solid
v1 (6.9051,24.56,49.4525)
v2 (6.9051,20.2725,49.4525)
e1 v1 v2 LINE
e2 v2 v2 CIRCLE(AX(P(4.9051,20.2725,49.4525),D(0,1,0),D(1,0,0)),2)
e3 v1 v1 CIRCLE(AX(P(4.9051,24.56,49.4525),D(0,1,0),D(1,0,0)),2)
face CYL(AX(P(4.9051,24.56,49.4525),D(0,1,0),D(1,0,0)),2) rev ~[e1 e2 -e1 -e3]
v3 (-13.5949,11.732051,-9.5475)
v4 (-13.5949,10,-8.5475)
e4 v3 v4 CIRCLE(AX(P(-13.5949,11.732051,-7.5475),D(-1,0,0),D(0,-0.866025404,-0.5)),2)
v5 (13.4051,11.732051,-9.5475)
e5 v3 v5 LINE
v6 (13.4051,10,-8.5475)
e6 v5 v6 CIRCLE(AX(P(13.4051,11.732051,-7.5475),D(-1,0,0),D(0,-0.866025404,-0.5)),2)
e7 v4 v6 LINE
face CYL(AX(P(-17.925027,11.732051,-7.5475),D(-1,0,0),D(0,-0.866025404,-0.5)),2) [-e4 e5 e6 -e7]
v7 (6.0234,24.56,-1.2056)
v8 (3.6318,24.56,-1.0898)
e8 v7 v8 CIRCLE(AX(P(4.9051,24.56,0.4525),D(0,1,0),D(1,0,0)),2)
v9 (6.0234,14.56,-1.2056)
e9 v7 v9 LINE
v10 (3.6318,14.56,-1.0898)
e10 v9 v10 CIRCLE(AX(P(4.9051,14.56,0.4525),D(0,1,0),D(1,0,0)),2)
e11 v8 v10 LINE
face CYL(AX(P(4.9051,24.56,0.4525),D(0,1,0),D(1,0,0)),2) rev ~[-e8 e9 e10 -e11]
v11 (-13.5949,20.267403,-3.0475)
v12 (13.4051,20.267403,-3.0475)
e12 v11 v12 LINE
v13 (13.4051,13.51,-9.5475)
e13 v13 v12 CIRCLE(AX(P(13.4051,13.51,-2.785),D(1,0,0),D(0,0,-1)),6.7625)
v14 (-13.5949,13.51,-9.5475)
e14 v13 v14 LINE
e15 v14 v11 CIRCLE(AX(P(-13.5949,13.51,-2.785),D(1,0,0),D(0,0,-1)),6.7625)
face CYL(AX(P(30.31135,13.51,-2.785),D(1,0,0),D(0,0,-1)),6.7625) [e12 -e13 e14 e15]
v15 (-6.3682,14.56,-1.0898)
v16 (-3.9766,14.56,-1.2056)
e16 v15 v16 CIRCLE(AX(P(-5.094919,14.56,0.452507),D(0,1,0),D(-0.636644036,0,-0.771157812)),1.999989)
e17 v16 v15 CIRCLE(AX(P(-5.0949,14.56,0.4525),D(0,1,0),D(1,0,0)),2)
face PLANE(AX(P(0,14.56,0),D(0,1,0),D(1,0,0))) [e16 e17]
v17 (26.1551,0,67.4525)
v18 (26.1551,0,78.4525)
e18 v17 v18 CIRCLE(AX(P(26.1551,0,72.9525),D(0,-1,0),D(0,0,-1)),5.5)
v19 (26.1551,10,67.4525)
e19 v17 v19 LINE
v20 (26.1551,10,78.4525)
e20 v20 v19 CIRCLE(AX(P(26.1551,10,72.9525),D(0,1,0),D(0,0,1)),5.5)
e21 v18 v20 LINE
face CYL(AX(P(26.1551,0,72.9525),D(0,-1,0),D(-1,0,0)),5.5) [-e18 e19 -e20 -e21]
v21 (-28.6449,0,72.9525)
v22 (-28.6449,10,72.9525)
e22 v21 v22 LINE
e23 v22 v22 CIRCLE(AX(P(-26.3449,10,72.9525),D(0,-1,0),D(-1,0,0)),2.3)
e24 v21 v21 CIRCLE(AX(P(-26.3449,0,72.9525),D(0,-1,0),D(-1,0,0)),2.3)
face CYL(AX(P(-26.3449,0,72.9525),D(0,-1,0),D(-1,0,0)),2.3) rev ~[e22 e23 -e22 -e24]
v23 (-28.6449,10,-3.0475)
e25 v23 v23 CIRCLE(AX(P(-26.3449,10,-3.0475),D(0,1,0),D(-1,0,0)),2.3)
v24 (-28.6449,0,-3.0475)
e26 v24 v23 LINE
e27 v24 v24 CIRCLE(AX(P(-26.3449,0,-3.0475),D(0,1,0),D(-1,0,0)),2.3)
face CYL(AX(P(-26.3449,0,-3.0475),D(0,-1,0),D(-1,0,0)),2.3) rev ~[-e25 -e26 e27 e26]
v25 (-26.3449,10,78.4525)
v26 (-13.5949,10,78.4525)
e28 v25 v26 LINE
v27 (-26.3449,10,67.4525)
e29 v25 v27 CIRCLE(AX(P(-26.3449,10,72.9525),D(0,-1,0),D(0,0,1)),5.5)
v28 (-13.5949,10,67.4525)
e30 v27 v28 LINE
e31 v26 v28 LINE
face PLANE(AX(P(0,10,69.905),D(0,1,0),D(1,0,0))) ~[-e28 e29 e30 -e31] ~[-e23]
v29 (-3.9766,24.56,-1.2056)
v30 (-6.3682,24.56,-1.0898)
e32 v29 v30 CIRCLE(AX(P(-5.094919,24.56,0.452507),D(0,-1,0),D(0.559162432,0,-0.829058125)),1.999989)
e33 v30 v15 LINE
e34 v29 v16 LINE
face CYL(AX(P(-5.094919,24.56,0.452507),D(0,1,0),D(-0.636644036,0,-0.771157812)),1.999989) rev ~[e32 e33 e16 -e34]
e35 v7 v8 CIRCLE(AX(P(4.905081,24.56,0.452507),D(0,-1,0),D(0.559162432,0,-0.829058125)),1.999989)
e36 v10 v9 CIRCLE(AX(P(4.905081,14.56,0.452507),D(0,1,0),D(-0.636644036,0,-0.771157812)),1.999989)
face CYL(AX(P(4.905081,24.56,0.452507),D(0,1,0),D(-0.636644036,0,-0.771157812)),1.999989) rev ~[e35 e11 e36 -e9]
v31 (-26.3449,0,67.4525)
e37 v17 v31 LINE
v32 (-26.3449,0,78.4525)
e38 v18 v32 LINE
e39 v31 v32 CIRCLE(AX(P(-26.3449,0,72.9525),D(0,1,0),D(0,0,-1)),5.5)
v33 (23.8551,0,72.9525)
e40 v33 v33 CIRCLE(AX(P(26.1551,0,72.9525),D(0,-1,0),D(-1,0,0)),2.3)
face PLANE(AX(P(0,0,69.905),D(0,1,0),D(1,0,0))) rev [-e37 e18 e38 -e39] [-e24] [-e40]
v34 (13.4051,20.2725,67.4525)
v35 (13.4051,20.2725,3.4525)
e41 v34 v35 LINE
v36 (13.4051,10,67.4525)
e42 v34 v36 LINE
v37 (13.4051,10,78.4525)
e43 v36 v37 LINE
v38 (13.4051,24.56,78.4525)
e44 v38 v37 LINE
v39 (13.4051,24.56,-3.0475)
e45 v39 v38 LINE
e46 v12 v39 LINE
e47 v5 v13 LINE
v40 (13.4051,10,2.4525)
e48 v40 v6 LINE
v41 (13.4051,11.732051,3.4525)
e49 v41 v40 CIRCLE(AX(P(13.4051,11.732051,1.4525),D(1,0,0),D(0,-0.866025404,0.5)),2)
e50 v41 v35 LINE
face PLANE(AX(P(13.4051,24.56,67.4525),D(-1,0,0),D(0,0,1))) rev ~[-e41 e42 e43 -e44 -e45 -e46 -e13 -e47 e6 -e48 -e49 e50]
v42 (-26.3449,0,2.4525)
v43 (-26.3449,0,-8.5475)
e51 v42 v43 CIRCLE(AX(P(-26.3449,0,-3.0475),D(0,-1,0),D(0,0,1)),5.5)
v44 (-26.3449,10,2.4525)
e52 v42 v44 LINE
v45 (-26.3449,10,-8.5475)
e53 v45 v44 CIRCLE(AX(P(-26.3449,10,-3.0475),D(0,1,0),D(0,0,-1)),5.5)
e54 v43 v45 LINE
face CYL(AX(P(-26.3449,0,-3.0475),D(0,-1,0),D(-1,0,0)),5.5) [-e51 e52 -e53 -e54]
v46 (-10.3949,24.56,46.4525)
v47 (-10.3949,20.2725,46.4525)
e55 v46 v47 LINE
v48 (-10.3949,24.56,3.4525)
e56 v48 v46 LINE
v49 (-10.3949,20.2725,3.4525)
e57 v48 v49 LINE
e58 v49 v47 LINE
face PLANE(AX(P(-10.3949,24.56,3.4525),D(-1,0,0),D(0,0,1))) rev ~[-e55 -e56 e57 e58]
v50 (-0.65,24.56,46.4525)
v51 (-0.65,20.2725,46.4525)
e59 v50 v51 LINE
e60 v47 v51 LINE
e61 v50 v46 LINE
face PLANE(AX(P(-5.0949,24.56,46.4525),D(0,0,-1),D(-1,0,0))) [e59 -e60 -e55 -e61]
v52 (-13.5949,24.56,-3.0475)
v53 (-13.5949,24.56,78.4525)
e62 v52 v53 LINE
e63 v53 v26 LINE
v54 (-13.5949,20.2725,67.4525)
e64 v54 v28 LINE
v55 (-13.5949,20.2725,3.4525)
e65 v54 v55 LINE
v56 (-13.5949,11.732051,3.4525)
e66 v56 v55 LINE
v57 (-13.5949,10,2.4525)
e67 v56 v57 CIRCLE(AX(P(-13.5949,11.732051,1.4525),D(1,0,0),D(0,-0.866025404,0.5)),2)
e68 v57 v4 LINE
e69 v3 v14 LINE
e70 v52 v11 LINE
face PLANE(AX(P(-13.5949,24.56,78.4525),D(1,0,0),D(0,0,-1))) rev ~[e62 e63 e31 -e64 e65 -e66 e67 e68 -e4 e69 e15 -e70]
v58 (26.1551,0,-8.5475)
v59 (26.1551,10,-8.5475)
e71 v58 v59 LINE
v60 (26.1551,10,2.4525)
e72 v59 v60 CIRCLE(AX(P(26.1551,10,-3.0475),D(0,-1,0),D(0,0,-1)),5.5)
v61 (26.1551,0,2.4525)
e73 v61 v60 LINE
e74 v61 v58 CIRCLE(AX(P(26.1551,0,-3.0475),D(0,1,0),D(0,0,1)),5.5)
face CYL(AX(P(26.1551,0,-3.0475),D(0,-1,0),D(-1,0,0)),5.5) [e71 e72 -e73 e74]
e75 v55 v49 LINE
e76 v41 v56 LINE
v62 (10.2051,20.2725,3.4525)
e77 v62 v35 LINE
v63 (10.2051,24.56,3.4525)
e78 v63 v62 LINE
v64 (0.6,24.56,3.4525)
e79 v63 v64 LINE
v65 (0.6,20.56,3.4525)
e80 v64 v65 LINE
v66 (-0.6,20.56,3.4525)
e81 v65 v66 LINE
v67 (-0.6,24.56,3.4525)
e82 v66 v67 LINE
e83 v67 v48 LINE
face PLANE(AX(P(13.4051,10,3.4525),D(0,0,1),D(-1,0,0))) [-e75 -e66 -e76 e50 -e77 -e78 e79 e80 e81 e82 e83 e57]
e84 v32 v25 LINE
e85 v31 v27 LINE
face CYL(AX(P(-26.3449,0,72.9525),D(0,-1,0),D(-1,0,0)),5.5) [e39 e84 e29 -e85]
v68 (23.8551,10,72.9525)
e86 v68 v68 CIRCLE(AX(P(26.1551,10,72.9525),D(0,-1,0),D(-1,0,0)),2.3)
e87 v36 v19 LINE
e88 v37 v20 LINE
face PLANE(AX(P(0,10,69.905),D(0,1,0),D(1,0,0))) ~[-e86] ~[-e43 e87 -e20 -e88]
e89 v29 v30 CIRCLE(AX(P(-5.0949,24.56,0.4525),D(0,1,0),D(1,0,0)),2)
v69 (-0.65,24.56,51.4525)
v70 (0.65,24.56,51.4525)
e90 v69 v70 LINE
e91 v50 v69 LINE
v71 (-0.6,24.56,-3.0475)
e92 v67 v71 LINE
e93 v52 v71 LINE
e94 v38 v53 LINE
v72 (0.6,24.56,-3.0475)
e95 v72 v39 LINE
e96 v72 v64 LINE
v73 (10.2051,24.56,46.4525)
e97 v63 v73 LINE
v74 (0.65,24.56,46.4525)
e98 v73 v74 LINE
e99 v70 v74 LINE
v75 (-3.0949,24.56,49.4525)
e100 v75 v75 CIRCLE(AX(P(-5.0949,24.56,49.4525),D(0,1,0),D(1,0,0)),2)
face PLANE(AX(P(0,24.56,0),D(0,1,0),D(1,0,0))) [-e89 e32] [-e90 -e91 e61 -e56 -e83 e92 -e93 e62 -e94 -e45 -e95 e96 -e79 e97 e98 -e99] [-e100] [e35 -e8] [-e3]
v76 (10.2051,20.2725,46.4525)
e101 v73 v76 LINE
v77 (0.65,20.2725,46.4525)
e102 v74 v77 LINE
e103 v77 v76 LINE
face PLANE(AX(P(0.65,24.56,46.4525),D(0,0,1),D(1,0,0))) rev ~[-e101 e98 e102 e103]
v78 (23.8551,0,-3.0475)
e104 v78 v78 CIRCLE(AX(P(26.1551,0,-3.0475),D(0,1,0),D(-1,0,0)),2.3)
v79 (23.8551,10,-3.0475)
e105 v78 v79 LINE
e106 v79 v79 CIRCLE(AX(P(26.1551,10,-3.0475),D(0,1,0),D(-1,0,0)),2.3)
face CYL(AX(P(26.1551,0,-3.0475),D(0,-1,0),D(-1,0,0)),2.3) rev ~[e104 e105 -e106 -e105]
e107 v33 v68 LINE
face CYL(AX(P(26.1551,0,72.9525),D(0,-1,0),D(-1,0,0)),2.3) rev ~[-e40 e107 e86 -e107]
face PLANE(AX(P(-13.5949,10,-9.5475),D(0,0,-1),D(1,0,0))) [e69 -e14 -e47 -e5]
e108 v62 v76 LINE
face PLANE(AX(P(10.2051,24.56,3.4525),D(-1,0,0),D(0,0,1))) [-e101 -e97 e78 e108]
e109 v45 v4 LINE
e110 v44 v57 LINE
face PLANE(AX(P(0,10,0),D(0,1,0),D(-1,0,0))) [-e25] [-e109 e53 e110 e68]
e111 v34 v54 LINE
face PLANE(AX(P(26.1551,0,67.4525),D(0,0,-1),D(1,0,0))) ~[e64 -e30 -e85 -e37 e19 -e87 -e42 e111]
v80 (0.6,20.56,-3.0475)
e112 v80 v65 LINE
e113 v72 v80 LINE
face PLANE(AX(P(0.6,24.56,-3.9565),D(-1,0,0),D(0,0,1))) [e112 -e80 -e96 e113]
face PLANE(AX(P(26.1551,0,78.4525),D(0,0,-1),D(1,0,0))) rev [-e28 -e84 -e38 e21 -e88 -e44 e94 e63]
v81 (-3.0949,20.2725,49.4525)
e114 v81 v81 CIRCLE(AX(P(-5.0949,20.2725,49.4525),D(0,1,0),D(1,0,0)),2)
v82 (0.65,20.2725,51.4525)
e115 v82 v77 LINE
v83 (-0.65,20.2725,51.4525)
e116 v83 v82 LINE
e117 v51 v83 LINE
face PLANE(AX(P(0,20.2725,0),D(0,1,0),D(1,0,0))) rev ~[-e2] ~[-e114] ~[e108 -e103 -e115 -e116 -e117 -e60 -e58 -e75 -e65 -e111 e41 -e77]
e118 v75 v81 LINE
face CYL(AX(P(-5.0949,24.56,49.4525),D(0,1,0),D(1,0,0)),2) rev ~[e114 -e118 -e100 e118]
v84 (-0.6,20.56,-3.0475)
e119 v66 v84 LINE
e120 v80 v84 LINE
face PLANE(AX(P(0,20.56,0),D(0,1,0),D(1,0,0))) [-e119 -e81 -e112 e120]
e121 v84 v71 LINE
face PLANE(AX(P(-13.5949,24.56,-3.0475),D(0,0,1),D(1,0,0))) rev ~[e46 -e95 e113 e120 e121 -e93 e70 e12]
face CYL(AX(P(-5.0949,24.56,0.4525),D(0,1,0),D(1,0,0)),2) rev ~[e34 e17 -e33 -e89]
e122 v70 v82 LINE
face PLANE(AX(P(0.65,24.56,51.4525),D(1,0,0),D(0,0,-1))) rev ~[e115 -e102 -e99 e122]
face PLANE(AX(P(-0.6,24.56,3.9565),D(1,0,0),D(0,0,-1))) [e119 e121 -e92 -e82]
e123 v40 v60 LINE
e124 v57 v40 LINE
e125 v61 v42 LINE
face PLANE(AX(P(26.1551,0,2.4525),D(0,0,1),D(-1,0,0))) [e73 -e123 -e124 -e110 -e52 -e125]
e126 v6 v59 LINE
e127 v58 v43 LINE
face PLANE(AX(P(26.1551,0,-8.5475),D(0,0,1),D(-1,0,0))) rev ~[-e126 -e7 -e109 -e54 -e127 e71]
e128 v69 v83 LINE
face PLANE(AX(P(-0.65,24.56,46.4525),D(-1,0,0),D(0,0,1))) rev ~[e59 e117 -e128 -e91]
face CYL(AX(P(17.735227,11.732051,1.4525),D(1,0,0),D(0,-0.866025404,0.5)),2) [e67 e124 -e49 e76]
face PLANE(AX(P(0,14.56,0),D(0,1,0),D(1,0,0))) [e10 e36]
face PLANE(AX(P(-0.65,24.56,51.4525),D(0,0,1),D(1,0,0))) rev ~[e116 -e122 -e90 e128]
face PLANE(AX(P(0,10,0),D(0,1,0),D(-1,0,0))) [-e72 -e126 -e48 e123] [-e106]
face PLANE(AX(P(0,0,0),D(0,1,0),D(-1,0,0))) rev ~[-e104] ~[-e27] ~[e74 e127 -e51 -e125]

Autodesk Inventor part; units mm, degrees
ref_plane "YZ Plane" through (0, 0, 0) normal (1, 0, 0) x (0, 1, 0)
ref_plane "XZ Plane" through (0, 0, 0) normal (0, 1, 0) x (-1, 0, 0)
ref_plane "XY Plane" through (0, 0, 0) normal (0, 0, 1) x (1, 0, 0)
sketch "Sketch1" plane through (0, 0, 0) normal (0, 1, 0) x (-1, 0, 0)
  circle A0 centre (-26.1551, -3.0475) radius 2.3
  arc A1 (-34.9051, -0.0475) -> (-17.4051, -0.0475) centre (-26.1551, -0.0475) ccw
  arc A2 (17.5949, -0.0475) -> (35.0949, -0.0475) centre (26.3449, -0.0475) ccw
  circle A3 centre (26.3449, -3.0475) radius 2.3
  circle A4 centre (-26.1551, -3.0475) radius 2.3
  circle A5 centre (26.3449, -3.0475) radius 2.3
  circle A6 centre (26.3449, -0.0475) radius 8.75
  circle A7 centre (-26.1551, -0.0475) radius 8.75
  line L0 (-34.9051, -0.0475) -> (-17.4051, -0.0475)
  line L1 (17.5949, -0.0475) -> (35.0949, -0.0475)
  circle A8 centre (-26.1551, -3.0475) radius 5.5
  circle A9 centre (26.3449, -3.0475) radius 5.5
  line L2 (-26.1551, -8.5475) -> (26.3449, -8.5475)
  line L3 (-26.1551, 2.4525) -> (26.3449, 2.4525)
  point P0 (0, 0)
  dimension "d0" = 11
  dimension "d1" = 11
  dimension "d41" = 4.6
  dimension "d42" = 4.6
extrude "Extrusion1" add sketch "Sketch1" along normal blind 10 contours L2 A8 L0 A1 | A1 A7 L3 A6 A2 L2 | A7 L0 A8 L3 | A8 L0 | L0 A8 | A2 L1 A9 L2 | L3 A9 L1 A6 | A9 L1 | A9 L1 picked at (-18.6939, -1.0014) picked at (-20.5799, 1.133) picked at (18.8536, -1.0809) picked at (20.7697, 1.133)
sketch "Sketch2" plane through (0, 10, 0) normal (0, 1, 0) x (1, 0, 0)
  line L0 (26.1551, 8.5475) -> (-26.3449, 8.5475) projected
  line L1 (-26.3449, -2.4525) -> (26.1551, -2.4525) projected
  arc A0 (-26.3449, 8.5475) -> (-26.3449, -2.4525) centre (-26.3449, 3.0475) ccw projected
  arc A1 (26.1551, -2.4525) -> (26.1551, 8.5475) centre (26.1551, 3.0475) ccw projected
  line L2 (-31.8449, 3.0475) -> (31.6551, 3.0475)
  line L3 (13.4051, -3.4525) -> (-13.5949, -3.4525)
  line L4 (-13.5949, -3.4525) -> (-13.5949, 9.5475)
  line L5 (-13.5949, 9.5475) -> (13.4051, 9.5475)
  line L6 (13.4051, 9.5475) -> (13.4051, -3.4525)
  line L7 (13.4051, -3.4525) -> (-13.5949, 9.5475) construction
  line L8 (-13.5949, -3.4525) -> (13.4051, 9.5475) construction
  point P0 (0, 0)
  point P1 (-0.0949, 3.0475)
  dimension "d4" = 27
  dimension "d5" = 13
extrude "Extrusion2" add sketch "Sketch2" along normal blind 14.56 contours L6 L2 L4 L0 | L0 L4 L5 L6 | L6 L1 L4 L2 | L6 L3 L4 L1
fillet "Fillet1" radius 2 2 edges at (-0.0949, 10, 3.4525) (-0.0949, 10, -9.5475)
sketch "Sketch3" plane through (0, 24.56, 0) normal (0, 1, 0) x (1, 0, 0)
  arc A0 (-6.3682, 1.0898) -> (-3.9766, 1.2056) centre (-5.0949, -0.4525) ccw
  arc A1 (3.6318, 1.0898) -> (6.0234, 1.2056) centre (4.9051, -0.4525) ccw
  circle A2 centre (4.9051, -0.4525) radius 2
  circle A3 centre (-5.0949, -0.4525) radius 2
  line L0 (-13.5949, 9.5475) -> (-13.5949, -3.4525) projected
  line L1 (13.4051, 9.5475) -> (-13.5949, 9.5475) projected
  line L2 (-13.5949, -3.4525) -> (13.4051, -3.4525) projected
  line L3 (13.4051, -3.4525) -> (13.4051, 9.5475) projected
  point P0 (0, 0)
  point P1 (6.0234, 1.2056)
  point P2 (3.6318, 1.0898)
  point P3 (-3.9766, 1.2056)
  point P4 (-6.3682, 1.0898)
  dimension "d12" = 8.5
  dimension "d13" = 8.5
  dimension "d43" = 2
  dimension "d44" = 2
extrude "Extrusion3" cut sketch "Sketch3" against normal blind 10 contours A3 A0 | A2 A1
sketch "Sketch4" plane through (0, 24.56, 0) normal (0, 1, 0) x (1, 0, 0)
  line L0 (13.4051, 9.5475) -> (-13.5949, 9.5475) projected
  line L1 (-13.5949, -2.4525) -> (-13.5949, 8.5475) projected
  line L2 (13.4051, 9.5475) -> (-13.5949, 9.5475)
  line L3 (-13.5949, 9.5475) -> (-13.5949, 3.0475)
  line L4 (-13.5949, 3.0475) -> (13.4051, 3.0475)
  line L5 (13.4051, 3.0475) -> (13.4051, 9.5475)
  point P0 (0, 0)
extrude "Extrusion4" cut sketch "Sketch4" against normal blind 4.2875
fillet "Fillet2" radius 6.7625 1 edges at (-0.0949, 20.2725, -9.5475)
sketch "Sketch5" plane through (0, 24.56, 0) normal (0, 1, 0) x (1, 0, 0)
  line L0 (-13.5949, -3.4525) -> (13.4051, -3.4525) projected
  line L1 (-10.3949, -3.4525) -> (-10.3949, -67.4525)
  line L2 (10.2051, -3.4525) -> (10.2051, -67.4525)
  line L3 (-13.5949, 3.0475) -> (-13.5949, -3.4525) projected
  circle A0 centre (-5.0949, -49.4525) radius 2
  line L4 (13.4051, -3.4525) -> (13.4051, 3.0475) projected
  circle A1 centre (4.9051, -49.4525) radius 2
  circle A2 centre (4.9051, -49.4525) radius 3
  circle A3 centre (-5.0949, -49.4525) radius 3
  line L5 (-10.3949, -67.4525) -> (10.2051, -67.4525)
  line L6 (-10.3949, -67.4525) -> (-13.5949, -67.4525)
  line L7 (-13.5949, -67.4525) -> (-13.5949, -3.4525)
  line L8 (10.2051, -67.4525) -> (13.4051, -67.4525)
  line L9 (13.4051, -67.4525) -> (13.4051, -3.4525)
  line L10 (-5.0949, -46.4525) -> (4.9051, -46.4525)
  line L11 (10.2051, -46.4525) -> (-10.3949, -46.4525)
  line L12 (-0.65, -46.4525) -> (-0.65, -51.4525)
  line L13 (-0.65, -51.4525) -> (0.65, -51.4525)
  line L14 (0.65, -51.4525) -> (0.65, -46.4525)
  line L15 (0, -46.4525) -> (-0.65, -51.4525) construction
  line L16 (0, -46.4525) -> (0.65, -51.4525) construction
  point P0 (0, 0)
  point P1 (13.4051, -0.2025)
  point P2 (4.9051, -46.4525)
  dimension "d28" = 6
  dimension "d29" = 6
  dimension "d19" = 3.2
  dimension "d20" = 64
  dimension "d21" = 3.2
  dimension "d22" = 64
  dimension "d23" = 46
  dimension "d24" = 8.5
  dimension "d25" = 4
  dimension "d26" = 8.5
  dimension "d27" = 4
  dimension "d30" = 1.3
extrude "Extrusion5" add sketch "Sketch5" against normal blind 4.2875 contours L0 L1 L6 L7 | L0 L9 L8 L2 | A2 | A3 | L11 L10 L12 L13 L14 L2 L5 L1
sketch "Sketch6" plane through (0, 24.56, 0) normal (0, 1, 0) x (1, 0, 0)
  line L0 (13.4051, -67.4525) -> (-13.5949, -67.4525) projected
  line L1 (-13.5949, -67.4525) -> (13.4051, -67.4525)
  line L2 (13.4051, -67.4525) -> (13.4051, -78.4525)
  line L3 (13.4051, -78.4525) -> (-13.5949, -78.4525)
  line L4 (-13.5949, -78.4525) -> (-13.5949, -67.4525)
  circle A0 centre (26.1551, 3.0475) radius 2.3 projected
  circle A1 centre (-26.3449, 3.0475) radius 2.3 projected
  point P0 (0, 0)
  dimension "d34" = 11
extrude "Extrusion6" add sketch "Sketch6" against normal up to surface (14.56 mm away) contours L2 L3 L4 L0
ref_plane "Work Plane1" through (-13.5949, 24.56, 34.9525) normal (0, 0, 1) x (1, 0, 0)
sketch "Sketch7" plane through (0, 24.56, 0) normal (0, 1, 0) x (1, 0, 0)
  point P0 (0, 0)
mirror "Mirror1" about plane through (-13.5949, 24.56, 34.9525) normal (0, 0, 1) of "Extrusion1"
sketch "Sketch8" plane through (0, 24.56, 0) normal (0, 1, 0) x (1, 0, 0)
  line L0 (0.6, -3.9565) -> (-0.6, -3.9565)
  line L1 (-0.6, -3.9565) -> (-0.6, 3.9565)
  line L2 (-0.6, 3.9565) -> (0.6, 3.9565)
  line L3 (0.6, 3.9565) -> (0.6, -3.9565)
  line L4 (0.6, -3.9565) -> (-0.6, 3.9565) construction
  line L5 (-0.6, -3.9565) -> (0.6, 3.9565) construction
  point P0 (0, 0)
  dimension "d38" = 1.2
extrude "Extrusion7" cut sketch "Sketch8" against normal blind 4
properties part number "SERVO_MOUNT_TOBASE"
